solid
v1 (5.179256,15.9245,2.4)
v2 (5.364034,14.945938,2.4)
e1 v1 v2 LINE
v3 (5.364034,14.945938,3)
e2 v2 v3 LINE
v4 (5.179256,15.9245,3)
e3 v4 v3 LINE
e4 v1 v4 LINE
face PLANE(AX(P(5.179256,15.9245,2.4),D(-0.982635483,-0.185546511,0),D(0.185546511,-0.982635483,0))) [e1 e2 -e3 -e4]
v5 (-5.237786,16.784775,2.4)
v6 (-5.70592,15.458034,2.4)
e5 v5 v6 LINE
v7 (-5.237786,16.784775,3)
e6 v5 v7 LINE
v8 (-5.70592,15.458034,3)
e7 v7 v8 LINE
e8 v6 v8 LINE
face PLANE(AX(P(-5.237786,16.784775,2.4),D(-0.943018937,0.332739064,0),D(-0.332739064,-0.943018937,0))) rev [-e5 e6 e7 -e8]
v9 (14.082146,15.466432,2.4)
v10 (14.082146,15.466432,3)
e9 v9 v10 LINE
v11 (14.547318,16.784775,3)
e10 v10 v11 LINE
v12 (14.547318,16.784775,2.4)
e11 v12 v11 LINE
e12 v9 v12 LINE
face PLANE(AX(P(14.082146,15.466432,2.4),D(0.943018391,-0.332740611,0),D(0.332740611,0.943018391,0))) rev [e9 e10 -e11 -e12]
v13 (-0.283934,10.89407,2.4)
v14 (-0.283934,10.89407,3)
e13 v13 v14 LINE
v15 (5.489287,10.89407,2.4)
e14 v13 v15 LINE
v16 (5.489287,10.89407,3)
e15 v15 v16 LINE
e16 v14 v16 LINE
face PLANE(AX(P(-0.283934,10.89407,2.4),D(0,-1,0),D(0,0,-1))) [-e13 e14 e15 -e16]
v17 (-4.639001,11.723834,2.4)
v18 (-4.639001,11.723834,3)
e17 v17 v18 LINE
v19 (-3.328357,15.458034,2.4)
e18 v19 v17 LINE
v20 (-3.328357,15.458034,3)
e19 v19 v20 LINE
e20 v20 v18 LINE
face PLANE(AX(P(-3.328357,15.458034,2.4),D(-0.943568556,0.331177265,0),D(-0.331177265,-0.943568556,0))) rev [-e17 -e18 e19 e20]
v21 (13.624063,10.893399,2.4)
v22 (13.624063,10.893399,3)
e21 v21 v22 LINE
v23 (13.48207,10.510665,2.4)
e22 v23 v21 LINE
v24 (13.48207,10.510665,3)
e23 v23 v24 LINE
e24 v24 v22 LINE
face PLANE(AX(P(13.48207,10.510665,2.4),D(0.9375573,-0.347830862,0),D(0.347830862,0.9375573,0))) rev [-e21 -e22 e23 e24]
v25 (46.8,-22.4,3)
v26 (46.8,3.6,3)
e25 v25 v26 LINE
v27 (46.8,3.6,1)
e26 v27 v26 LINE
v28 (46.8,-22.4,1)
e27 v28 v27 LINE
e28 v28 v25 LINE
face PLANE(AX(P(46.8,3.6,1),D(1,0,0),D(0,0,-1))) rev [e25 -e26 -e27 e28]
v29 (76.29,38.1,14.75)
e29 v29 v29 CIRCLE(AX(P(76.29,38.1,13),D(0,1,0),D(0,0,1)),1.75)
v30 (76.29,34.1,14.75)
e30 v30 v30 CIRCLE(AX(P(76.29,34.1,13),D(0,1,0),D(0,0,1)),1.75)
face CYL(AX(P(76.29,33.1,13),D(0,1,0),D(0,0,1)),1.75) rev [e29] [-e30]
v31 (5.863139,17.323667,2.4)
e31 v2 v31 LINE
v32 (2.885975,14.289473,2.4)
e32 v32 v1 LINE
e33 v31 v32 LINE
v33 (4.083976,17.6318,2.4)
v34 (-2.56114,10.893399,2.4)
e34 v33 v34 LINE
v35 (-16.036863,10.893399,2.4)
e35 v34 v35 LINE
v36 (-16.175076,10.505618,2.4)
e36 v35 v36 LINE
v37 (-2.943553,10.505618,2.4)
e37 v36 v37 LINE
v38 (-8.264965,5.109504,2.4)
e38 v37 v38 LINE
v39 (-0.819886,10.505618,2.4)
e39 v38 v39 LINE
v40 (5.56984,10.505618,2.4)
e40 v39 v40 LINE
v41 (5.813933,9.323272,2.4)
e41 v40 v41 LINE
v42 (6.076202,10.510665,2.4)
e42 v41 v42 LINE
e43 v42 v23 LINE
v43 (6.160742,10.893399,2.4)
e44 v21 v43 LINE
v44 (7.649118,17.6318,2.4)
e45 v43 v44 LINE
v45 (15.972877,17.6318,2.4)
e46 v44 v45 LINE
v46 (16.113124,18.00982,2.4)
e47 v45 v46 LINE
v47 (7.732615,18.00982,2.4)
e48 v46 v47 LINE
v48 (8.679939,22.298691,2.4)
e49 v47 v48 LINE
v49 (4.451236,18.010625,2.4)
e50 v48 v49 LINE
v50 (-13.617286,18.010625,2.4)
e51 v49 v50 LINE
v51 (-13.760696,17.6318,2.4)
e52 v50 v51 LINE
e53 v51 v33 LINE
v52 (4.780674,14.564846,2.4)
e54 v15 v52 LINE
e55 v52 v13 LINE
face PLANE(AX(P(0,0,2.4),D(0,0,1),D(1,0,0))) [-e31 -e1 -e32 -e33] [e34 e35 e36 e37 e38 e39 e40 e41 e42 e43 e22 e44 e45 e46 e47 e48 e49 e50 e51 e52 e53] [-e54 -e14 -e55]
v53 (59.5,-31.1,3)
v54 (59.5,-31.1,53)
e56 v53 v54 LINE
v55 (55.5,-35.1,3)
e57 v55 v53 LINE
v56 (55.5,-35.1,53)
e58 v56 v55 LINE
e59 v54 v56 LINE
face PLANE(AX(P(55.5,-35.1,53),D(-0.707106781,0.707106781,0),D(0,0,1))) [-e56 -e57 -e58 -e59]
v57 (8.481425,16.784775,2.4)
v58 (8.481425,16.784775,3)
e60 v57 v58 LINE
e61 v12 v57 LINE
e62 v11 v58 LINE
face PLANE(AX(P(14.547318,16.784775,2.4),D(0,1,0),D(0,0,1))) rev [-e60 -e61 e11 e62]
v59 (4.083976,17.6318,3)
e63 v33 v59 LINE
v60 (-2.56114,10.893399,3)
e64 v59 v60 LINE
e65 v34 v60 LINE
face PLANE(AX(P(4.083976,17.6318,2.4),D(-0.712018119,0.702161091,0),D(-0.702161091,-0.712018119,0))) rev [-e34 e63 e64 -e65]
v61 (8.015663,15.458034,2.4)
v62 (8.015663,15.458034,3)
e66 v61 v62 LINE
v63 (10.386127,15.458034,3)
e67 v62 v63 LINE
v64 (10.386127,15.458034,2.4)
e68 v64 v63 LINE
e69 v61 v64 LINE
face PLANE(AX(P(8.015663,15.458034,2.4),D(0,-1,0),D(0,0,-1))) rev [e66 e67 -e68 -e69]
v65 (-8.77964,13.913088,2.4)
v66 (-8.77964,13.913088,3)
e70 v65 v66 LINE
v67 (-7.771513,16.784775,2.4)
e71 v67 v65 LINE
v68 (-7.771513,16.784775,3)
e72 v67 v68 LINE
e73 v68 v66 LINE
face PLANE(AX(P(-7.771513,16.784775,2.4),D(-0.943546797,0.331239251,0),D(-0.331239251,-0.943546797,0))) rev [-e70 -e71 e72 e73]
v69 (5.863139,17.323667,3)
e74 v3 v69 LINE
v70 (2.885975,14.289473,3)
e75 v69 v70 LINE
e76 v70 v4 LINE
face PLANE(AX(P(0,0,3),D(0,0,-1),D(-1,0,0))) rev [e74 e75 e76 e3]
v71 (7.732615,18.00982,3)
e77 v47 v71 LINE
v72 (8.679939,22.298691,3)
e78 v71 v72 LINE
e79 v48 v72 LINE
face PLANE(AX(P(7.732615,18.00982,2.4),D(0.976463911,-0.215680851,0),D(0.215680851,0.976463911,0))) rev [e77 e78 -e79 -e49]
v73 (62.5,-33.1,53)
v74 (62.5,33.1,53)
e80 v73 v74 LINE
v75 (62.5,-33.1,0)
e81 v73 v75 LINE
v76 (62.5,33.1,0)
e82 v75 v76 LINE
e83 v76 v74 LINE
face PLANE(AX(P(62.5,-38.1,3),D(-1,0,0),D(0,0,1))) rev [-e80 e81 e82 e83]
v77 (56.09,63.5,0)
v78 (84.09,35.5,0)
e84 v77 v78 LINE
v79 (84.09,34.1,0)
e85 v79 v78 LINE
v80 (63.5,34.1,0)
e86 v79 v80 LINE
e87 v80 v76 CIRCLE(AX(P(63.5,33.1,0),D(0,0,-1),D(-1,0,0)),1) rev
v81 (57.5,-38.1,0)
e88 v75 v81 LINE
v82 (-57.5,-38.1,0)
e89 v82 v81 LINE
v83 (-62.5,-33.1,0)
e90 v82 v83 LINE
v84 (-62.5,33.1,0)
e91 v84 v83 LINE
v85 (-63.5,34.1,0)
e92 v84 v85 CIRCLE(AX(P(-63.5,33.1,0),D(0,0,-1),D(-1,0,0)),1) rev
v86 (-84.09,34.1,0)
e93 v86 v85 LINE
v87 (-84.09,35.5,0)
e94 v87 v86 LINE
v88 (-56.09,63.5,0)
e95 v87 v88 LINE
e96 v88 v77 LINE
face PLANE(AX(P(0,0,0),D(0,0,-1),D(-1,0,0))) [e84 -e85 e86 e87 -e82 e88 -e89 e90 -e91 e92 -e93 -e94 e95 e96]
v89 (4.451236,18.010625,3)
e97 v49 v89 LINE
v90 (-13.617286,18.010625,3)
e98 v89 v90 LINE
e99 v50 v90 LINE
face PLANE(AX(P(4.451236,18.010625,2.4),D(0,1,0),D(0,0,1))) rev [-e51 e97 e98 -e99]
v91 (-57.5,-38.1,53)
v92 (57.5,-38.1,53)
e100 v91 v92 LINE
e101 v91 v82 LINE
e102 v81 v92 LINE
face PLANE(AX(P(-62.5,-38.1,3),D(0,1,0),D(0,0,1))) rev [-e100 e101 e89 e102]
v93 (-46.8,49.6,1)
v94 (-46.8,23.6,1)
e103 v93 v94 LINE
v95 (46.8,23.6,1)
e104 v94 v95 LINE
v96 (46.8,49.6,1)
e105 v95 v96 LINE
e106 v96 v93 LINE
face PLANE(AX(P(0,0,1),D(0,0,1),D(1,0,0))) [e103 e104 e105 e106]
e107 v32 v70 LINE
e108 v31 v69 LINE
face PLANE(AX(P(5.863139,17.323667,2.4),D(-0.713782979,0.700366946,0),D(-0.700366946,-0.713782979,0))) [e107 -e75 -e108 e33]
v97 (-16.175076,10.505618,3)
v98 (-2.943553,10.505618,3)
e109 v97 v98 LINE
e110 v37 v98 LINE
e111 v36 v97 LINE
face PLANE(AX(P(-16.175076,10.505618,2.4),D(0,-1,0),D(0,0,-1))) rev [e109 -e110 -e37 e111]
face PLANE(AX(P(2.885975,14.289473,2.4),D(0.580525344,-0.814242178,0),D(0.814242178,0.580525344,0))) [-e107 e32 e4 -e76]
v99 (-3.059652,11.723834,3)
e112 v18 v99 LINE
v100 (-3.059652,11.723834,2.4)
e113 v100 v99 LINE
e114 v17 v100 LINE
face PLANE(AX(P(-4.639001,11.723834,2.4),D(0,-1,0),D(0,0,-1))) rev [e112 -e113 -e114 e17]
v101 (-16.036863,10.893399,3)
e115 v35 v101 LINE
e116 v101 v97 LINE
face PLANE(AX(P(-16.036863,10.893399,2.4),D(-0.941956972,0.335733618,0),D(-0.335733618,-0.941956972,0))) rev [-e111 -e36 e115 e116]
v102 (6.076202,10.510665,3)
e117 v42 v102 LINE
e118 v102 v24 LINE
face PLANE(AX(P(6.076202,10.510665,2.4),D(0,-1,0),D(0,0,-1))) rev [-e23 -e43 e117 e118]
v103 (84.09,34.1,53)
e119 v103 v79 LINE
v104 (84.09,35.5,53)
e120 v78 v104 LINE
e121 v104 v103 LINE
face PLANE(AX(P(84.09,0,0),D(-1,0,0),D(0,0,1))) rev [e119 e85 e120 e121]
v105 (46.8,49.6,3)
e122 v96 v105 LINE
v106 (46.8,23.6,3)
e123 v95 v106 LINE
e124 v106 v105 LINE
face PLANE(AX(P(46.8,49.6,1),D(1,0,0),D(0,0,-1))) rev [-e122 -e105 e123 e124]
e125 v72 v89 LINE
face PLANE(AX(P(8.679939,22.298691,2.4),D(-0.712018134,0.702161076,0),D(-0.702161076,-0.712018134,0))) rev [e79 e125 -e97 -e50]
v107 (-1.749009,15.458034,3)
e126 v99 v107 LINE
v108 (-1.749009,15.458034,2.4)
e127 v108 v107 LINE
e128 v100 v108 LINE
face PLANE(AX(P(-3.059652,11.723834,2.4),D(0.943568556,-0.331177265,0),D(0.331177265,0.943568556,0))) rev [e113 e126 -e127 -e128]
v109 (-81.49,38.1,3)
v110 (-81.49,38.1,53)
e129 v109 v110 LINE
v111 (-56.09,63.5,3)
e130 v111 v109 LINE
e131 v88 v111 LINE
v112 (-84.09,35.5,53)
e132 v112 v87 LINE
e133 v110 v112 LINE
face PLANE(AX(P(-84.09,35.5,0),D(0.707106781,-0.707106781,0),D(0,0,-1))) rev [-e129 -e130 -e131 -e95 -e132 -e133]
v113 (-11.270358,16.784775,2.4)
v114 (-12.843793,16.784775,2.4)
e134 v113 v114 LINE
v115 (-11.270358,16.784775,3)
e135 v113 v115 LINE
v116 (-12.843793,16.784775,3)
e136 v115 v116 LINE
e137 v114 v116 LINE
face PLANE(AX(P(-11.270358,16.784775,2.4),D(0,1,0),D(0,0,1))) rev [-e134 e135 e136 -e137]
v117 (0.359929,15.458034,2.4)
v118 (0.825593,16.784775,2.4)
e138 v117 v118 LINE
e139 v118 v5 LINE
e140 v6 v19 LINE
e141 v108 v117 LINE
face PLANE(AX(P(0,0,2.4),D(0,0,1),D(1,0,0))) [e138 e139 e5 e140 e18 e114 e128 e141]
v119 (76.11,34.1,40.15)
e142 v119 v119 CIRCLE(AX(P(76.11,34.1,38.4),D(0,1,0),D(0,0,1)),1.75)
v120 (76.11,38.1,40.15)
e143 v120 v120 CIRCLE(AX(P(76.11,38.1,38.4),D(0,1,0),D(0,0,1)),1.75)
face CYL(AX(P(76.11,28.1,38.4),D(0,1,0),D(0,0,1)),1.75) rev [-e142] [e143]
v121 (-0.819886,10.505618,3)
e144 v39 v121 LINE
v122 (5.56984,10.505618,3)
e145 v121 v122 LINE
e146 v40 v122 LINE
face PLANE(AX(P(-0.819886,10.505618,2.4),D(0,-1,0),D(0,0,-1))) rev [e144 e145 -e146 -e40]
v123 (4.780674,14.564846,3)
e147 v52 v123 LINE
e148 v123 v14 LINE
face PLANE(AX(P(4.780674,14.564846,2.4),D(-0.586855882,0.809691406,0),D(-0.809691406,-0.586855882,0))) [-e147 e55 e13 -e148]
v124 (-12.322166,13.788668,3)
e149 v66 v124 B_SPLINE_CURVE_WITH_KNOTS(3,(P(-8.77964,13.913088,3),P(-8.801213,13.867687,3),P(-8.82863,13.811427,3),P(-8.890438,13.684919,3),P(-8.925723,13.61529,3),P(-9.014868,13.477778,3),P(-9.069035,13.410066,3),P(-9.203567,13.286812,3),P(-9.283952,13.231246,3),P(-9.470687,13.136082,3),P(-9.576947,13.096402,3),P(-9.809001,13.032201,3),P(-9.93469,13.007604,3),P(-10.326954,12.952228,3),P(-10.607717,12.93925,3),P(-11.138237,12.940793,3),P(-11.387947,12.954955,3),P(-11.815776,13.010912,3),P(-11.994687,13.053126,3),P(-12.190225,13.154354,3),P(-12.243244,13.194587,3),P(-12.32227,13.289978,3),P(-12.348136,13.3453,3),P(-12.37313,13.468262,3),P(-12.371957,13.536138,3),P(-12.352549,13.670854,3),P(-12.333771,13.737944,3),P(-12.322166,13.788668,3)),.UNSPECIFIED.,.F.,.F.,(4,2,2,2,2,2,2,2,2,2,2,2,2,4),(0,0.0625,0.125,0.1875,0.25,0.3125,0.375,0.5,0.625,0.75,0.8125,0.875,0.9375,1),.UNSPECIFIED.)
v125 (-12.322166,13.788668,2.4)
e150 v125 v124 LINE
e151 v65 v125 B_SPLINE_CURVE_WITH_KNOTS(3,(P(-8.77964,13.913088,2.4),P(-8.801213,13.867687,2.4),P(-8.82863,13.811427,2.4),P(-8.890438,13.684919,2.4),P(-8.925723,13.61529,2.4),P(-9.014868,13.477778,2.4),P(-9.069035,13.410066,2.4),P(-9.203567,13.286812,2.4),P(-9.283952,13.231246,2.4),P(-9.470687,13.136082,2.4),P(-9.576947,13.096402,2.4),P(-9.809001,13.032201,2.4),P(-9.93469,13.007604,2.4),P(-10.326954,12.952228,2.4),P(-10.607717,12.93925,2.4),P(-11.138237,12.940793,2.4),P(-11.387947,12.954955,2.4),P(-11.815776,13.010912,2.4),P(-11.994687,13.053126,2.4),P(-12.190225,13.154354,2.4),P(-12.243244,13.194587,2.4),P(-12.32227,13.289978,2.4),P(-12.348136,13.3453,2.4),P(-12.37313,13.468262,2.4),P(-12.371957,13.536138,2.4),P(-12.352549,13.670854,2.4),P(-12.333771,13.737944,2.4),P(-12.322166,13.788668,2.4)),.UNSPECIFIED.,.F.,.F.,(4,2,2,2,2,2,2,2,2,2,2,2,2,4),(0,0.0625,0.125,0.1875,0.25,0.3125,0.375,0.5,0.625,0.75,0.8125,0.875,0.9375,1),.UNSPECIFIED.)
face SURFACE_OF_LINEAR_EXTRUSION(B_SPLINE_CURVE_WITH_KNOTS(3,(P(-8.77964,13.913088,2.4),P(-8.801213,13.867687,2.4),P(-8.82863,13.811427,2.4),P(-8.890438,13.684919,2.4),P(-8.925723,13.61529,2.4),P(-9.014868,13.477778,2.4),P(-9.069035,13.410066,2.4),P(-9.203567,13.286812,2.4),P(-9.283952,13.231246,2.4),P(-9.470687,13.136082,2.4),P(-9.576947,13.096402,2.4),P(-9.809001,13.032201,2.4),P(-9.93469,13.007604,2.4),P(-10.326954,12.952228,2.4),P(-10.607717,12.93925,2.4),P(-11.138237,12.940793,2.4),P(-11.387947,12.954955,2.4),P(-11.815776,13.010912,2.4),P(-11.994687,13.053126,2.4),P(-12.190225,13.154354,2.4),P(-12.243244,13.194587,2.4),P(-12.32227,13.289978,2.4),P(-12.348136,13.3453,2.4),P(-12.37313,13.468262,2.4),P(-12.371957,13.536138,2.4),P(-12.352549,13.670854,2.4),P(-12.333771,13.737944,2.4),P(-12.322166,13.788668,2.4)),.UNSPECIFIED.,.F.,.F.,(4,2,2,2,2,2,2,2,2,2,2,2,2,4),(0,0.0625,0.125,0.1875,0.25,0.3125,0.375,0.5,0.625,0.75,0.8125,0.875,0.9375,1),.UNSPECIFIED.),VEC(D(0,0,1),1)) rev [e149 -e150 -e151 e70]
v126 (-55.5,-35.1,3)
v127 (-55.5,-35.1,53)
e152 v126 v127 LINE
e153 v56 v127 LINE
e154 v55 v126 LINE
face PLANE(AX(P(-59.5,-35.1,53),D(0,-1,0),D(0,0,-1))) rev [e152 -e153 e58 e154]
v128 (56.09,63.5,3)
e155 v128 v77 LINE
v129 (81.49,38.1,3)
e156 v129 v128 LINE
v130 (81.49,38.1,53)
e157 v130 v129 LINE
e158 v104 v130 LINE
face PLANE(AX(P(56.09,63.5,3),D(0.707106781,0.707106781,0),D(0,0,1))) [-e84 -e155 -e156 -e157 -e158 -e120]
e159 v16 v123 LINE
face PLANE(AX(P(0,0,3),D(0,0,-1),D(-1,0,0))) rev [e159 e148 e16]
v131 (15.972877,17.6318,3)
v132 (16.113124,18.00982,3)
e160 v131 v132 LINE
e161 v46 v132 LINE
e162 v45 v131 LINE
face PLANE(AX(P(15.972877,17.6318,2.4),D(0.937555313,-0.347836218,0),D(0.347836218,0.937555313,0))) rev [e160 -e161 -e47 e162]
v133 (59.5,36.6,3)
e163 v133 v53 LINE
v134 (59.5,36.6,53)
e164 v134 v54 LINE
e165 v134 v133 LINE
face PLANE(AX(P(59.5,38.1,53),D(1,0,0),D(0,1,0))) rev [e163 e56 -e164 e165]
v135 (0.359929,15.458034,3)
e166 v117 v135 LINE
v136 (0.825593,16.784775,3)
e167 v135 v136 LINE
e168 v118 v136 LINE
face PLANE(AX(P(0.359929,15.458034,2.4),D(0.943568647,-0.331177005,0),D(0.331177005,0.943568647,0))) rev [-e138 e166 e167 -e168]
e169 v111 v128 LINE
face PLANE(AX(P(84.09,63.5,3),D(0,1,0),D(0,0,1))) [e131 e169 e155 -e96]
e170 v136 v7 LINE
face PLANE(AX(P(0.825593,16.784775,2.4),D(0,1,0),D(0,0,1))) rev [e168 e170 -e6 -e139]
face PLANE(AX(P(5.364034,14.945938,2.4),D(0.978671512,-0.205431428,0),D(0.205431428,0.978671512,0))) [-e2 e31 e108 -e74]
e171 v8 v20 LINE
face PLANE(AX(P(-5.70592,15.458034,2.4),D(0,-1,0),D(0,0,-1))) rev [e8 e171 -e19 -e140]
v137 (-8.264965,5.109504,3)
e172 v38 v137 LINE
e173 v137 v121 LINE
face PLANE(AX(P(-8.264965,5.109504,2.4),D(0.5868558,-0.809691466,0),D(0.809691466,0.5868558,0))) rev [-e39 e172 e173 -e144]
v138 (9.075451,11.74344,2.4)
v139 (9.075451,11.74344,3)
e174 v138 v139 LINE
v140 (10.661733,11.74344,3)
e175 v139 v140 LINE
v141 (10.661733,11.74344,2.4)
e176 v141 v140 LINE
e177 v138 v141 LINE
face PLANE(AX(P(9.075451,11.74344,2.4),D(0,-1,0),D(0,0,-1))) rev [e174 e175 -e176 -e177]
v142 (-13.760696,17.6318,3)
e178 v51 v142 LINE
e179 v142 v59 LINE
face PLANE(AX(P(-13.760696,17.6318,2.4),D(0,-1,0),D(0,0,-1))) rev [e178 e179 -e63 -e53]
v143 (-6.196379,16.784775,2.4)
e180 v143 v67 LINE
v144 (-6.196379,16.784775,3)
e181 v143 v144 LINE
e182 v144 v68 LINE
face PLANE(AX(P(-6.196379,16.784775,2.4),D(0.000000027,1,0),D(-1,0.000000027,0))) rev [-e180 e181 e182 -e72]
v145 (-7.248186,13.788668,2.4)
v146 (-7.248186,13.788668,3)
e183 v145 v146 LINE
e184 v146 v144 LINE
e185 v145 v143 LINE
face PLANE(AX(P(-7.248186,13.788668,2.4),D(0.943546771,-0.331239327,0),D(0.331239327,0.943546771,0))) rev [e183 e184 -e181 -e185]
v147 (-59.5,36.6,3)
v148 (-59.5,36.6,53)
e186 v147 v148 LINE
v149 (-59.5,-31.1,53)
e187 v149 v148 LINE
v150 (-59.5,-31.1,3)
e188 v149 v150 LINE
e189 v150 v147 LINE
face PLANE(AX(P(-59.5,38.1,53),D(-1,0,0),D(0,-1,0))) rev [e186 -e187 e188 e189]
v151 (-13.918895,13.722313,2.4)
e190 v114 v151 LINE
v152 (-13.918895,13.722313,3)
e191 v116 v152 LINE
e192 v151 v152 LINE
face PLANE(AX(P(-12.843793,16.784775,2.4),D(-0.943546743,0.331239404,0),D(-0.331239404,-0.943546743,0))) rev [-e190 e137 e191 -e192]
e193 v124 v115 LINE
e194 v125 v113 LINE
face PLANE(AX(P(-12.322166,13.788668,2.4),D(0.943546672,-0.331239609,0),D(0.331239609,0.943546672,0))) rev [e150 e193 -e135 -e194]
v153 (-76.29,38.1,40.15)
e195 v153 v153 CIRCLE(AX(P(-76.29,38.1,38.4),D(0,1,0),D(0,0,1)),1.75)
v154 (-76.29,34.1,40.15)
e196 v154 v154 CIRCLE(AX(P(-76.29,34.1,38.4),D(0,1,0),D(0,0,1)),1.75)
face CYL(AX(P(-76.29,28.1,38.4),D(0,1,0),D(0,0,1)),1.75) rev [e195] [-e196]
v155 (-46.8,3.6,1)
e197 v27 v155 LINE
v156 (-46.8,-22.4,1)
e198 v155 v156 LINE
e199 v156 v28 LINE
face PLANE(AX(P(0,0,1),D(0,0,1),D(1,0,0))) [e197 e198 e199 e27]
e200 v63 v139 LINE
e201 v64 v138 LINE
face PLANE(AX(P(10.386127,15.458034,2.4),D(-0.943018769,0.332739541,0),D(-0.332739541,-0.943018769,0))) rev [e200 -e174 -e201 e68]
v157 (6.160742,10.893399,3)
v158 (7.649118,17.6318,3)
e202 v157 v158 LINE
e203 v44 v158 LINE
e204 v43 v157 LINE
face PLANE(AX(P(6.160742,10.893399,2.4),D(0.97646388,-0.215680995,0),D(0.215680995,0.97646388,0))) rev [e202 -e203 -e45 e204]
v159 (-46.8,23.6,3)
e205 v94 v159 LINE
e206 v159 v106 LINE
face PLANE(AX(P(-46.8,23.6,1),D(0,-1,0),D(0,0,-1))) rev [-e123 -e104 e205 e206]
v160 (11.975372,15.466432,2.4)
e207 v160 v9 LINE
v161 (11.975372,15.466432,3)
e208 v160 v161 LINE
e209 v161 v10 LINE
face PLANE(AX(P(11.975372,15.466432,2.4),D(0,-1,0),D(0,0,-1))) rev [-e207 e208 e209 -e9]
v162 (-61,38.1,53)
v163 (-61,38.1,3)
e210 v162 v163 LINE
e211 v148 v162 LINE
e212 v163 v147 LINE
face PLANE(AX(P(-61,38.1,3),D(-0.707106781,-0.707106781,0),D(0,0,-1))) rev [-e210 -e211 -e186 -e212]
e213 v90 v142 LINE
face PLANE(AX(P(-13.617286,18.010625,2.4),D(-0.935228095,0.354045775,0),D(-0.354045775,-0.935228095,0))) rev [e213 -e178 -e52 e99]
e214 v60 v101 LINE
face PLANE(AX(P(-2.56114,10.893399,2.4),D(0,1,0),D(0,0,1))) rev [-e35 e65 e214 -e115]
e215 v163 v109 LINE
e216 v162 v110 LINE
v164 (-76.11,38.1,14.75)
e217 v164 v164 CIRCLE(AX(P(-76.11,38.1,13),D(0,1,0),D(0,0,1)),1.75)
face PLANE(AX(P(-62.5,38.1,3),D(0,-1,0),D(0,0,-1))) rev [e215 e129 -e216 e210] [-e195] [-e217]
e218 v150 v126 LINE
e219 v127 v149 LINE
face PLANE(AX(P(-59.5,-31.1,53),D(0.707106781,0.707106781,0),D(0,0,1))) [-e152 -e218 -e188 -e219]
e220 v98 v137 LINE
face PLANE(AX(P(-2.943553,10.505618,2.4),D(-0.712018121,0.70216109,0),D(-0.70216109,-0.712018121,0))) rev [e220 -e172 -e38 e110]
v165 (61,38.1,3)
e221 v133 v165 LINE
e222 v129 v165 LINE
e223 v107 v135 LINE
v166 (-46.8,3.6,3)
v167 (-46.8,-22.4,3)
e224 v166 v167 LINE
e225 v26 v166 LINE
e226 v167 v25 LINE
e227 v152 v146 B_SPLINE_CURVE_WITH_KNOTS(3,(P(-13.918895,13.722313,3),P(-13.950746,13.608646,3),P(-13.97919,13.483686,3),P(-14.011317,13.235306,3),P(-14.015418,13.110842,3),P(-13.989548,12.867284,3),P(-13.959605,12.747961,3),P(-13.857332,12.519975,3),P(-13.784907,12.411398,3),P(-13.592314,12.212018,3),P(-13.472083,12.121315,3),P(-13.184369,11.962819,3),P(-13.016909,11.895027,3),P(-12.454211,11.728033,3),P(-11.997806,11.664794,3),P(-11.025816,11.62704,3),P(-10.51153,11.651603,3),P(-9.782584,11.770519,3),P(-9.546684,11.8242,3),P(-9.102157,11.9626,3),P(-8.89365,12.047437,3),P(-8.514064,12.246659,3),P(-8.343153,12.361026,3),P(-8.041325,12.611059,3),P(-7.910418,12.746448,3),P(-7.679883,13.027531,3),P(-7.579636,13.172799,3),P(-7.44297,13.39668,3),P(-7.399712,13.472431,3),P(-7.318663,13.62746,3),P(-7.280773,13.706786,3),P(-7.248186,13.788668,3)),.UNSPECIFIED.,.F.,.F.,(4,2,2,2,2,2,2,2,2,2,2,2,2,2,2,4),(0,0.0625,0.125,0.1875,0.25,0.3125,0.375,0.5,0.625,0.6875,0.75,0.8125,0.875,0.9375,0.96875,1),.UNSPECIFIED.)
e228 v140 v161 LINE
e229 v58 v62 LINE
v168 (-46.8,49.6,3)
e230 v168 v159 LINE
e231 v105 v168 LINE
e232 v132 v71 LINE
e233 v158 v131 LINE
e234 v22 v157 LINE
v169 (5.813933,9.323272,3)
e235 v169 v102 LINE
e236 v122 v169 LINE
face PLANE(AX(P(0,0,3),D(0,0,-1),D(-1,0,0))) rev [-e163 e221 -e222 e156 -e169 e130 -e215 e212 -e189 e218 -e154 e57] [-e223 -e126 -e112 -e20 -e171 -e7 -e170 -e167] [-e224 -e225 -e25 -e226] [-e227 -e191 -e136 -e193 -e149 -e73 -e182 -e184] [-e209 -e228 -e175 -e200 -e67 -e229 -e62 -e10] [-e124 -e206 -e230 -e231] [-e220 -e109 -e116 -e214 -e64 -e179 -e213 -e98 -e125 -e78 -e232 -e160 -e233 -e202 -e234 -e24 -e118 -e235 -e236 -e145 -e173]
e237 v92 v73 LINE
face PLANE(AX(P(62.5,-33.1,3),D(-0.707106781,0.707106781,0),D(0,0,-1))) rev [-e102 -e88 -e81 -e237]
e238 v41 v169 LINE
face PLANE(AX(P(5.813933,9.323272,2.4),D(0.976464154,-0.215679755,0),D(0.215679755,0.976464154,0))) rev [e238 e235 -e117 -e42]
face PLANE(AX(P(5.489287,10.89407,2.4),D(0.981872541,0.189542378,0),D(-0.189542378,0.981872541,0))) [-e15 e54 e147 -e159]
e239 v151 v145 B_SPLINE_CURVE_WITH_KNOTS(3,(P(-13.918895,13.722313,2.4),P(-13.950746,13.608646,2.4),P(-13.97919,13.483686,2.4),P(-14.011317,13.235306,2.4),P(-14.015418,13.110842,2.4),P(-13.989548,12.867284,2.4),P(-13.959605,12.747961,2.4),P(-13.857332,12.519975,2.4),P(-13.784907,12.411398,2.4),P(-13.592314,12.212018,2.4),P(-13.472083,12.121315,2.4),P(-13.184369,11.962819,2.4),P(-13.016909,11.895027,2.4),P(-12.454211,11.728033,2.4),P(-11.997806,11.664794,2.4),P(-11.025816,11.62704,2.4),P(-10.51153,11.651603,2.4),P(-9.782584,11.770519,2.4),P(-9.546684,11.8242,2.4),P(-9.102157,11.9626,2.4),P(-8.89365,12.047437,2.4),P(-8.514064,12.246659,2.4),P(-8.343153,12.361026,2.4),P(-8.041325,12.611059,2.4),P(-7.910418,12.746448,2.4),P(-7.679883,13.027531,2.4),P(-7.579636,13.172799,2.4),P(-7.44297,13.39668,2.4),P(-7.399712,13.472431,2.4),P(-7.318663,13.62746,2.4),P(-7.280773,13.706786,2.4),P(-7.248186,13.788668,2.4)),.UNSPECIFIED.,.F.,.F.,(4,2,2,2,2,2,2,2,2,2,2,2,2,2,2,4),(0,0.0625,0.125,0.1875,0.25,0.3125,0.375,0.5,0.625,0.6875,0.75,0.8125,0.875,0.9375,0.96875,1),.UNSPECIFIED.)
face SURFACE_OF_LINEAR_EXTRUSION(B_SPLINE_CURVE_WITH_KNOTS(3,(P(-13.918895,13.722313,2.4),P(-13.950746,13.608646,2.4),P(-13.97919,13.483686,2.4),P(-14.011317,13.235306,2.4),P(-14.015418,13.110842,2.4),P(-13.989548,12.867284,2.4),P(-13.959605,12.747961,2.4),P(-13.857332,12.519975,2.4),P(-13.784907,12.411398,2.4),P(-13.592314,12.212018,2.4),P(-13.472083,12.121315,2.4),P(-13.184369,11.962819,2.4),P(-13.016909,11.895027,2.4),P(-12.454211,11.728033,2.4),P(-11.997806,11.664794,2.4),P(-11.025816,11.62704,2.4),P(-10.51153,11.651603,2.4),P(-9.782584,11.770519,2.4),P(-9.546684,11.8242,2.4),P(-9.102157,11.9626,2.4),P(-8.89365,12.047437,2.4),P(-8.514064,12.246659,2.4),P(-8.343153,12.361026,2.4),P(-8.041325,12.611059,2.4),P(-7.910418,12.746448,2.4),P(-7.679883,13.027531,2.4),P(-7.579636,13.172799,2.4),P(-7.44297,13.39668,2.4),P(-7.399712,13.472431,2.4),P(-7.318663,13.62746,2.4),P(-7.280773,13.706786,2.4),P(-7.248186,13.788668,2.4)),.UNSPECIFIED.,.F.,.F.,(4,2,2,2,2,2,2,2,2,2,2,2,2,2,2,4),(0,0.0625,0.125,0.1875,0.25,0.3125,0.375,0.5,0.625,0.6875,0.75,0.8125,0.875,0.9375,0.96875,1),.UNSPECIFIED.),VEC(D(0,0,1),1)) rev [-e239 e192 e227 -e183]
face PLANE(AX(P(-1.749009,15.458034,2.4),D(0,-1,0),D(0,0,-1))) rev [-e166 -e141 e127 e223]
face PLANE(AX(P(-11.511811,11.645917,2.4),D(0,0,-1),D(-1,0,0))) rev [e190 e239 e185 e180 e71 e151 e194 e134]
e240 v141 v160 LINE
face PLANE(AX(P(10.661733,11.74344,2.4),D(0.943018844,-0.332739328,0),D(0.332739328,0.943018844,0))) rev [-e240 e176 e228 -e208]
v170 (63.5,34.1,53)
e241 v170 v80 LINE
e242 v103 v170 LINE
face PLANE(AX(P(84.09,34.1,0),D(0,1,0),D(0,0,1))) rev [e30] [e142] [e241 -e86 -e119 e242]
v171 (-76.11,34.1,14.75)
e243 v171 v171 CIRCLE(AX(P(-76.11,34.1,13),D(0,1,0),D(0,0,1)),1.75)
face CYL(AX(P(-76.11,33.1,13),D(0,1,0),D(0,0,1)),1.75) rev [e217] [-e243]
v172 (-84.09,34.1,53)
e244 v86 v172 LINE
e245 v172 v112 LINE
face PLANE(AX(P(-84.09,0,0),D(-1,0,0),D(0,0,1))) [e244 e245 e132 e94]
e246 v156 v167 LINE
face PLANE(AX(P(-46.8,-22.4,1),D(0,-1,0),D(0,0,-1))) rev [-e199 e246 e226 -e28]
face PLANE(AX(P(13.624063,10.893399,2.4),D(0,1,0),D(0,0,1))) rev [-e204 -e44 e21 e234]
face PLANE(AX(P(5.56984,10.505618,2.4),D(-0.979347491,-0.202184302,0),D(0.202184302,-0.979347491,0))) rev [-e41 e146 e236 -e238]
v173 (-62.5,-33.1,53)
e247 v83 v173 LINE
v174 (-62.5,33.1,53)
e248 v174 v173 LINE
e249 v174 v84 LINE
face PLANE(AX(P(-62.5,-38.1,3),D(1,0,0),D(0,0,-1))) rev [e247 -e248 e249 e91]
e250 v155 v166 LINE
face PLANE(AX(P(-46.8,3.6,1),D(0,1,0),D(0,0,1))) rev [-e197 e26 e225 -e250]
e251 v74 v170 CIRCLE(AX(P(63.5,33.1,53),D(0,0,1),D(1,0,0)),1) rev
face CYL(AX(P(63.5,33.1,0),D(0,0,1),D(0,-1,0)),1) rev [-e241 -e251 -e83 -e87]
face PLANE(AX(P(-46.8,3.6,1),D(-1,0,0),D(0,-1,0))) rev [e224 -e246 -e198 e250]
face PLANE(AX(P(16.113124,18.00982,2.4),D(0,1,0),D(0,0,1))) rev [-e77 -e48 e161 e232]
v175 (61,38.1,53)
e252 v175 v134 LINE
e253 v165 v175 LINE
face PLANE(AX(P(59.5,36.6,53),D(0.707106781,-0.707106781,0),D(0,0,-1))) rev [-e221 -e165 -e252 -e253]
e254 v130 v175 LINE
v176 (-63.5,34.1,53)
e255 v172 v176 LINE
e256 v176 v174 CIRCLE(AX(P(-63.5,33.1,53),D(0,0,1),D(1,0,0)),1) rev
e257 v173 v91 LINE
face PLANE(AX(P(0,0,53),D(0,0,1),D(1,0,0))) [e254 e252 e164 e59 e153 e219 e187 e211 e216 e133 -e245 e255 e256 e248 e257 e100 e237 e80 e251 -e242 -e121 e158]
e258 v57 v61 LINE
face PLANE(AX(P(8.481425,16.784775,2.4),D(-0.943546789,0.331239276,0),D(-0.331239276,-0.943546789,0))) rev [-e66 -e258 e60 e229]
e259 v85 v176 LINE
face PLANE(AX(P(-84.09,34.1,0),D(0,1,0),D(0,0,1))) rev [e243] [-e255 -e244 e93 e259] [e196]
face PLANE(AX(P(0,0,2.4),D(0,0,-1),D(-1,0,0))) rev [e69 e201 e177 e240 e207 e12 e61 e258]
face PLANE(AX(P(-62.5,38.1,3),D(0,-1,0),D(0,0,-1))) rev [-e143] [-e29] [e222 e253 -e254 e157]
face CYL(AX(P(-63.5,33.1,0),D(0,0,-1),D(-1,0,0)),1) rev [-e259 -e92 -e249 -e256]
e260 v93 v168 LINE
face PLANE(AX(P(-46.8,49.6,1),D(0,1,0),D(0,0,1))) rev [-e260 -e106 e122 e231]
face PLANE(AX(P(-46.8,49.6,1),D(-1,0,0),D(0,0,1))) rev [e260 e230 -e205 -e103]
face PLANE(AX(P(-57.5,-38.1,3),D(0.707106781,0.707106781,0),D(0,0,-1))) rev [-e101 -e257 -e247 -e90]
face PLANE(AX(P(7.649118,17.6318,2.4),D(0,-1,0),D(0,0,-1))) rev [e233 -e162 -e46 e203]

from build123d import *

# Parameters (mm, degrees)
SKETCH1_W           = 125
SKETCH1_H           = 76.2
BOSS_EXTRUDE1_DEPTH = 3
SKETCH2_W           = 3
SKETCH2_H           = 76.2
BOSS_EXTRUDE2_DEPTH = 50
SKETCH4_W           = 53
SKETCH4_H           = 4
BOSS_EXTRUDE4_DEPTH = 21.59
SKETCH5_W           = 53
SKETCH5_H           = 4
BOSS_EXTRUDE5_DEPTH = 21.59
SKETCH6_W           = 168.18
SKETCH6_H           = 25.4
BOSS_EXTRUDE6_DEPTH = 3
CHAMFER1_SIZE       = 28
SKETCH7_W           = 93.6
SKETCH7_H           = 26
CUT_EXTRUDE1_DEPTH  = 2
SKETCH9_W           = 119
SKETCH9_H           = 3
BOSS_EXTRUDE7_DEPTH = 50
CHAMFER2_SIZE       = 4
CHAMFER3_SIZE       = 5
CUT_EXTRUDE2_START  = -0.6
CUT_EXTRUDE2_DEPTH  = 0.6
SKETCH11_R          = 1.75
CUT_EXTRUDE3_DEPTH  = 5
FILLET1_R           = 1
CHAMFER4_SIZE       = 1.5
SKETCH13_R          = 1.75
CUT_EXTRUDE4_DEPTH  = 10


# Read off the part's stored shape, not the designer's step: Cut-Extrude2
with BuildPart() as part:
    # Sketch1 → Boss-Extrude1 (new body)
    with BuildSketch(Plane.XY):
        Rectangle(SKETCH1_W, SKETCH1_H)
    extrude(amount=BOSS_EXTRUDE1_DEPTH)

    # Sketch2 → Boss-Extrude2 (add)
    with BuildSketch(Plane.XY.offset(3)):
        with Locations((-61, 0)):
            Rectangle(SKETCH2_W, SKETCH2_H)
        with Locations((61, 0)):
            Rectangle(SKETCH2_W, SKETCH2_H)
    extrude(amount=BOSS_EXTRUDE2_DEPTH)

    # Sketch4 → Boss-Extrude4 (add)
    with BuildSketch(Plane.ZY.offset(62.5)):
        with Locations((26.5, 36.1)):
            Rectangle(SKETCH4_W, SKETCH4_H)
    extrude(amount=BOSS_EXTRUDE4_DEPTH)

    # Sketch5 → Boss-Extrude5 (add)
    with BuildSketch(Plane(origin=(62.5, 0, 0), x_dir=(0, 0, -1), z_dir=(1, 0, 0))):
        with Locations((-26.5, 36.1)):
            Rectangle(SKETCH5_W, SKETCH5_H)
    extrude(amount=BOSS_EXTRUDE5_DEPTH)

    # Sketch6 → Boss-Extrude6 (add)
    with BuildSketch(Plane(origin=(0, 0, 0), x_dir=(-1, 0, 0), z_dir=(0, 0, -1))):
        with Locations((0, 50.8)):
            Rectangle(SKETCH6_W, SKETCH6_H)
    extrude(amount=-BOSS_EXTRUDE6_DEPTH)

    # Chamfer1
    chamfer1_edges = [part.edges().sort_by_distance(p)[0] for p in [
        (-84.09, 63.5, 1.5),
        (84.09, 63.5, 1.5),
    ]]
    chamfer(chamfer1_edges, length=CHAMFER1_SIZE)

    # Sketch7 → Cut-Extrude1 (cut)
    with BuildSketch(Plane.XY.offset(3)):
        with Locations((0, -9.4)):
            Rectangle(SKETCH7_W, SKETCH7_H)
        with Locations((0, 36.6)):
            Rectangle(SKETCH7_W, SKETCH7_H)
    extrude(amount=-CUT_EXTRUDE1_DEPTH, mode=Mode.SUBTRACT)

    # Sketch9 → Boss-Extrude7 (add)
    with BuildSketch(Plane.XY.offset(3)):
        with Locations((0, -36.6)):
            Rectangle(SKETCH9_W, SKETCH9_H)
    extrude(amount=BOSS_EXTRUDE7_DEPTH)

    # Chamfer2
    chamfer2_edges = [part.edges().sort_by_distance(p)[0] for p in [
        (-59.5, -35.1, 28),
        (59.5, -35.1, 28),
    ]]
    chamfer(chamfer2_edges, length=CHAMFER2_SIZE)

    # Chamfer3
    chamfer3_edges = [part.edges().sort_by_distance(p)[0] for p in [
        (62.5, -38.1, 26.5),
        (-62.5, -38.1, 26.5),
    ]]
    chamfer(chamfer3_edges, length=CHAMFER3_SIZE)

    # Cut-Extrude2 outline → Cut-Extrude2 (cut)
    # profile 1 of 4: a face of its own
    with BuildSketch(Plane.XY.offset(3).offset(CUT_EXTRUDE2_START)):
        with BuildLine():
            Line((-12.843793417, 16.784775128), (-13.918894641, 13.722312614))
            add(Edge.make_bspline(
                [(-13.918894641, 13.722312614), (-13.950745906, 13.608646354), (-13.97919001, 13.483685694), (-14.011317489, 13.235305925), (-14.01541758, 13.110841548), (-13.989547543, 12.867284383), (-13.959604678, 12.747961158), (-13.857332343, 12.519974586), (-13.78490702, 12.411398187), (-13.592313629, 12.212018271), (-13.472083062, 12.121314997), (-13.184369222, 11.962818623), (-13.016909084, 11.895027419), (-12.454211206, 11.728033285), (-11.997806272, 11.664794493), (-11.025815686, 11.62704002), (-10.511530183, 11.651603075), (-9.78258436, 11.770518687), (-9.546683753, 11.824200176), (-9.102156978, 11.962599668), (-8.89364967, 12.047436893), (-8.514064046, 12.246658938), (-8.343153207, 12.361026326), (-8.04132547, 12.611058926), (-7.910418089, 12.746448479), (-7.679883041, 13.0275306), (-7.579636344, 13.172799488), (-7.44297026, 13.39668043), (-7.39971151, 13.472431032), (-7.318663078, 13.627460279), (-7.280772846, 13.706786212), (-7.248185858, 13.788667895)],
                knots=[0, 0, 0, 0, 0.0625, 0.0625, 0.125, 0.125, 0.1875, 0.1875, 0.25, 0.25, 0.3125, 0.3125, 0.375, 0.375, 0.5, 0.5, 0.625, 0.625, 0.6875, 0.6875, 0.75, 0.75, 0.8125, 0.8125, 0.875, 0.875, 0.9375, 0.9375, 0.96875, 0.96875, 1, 1, 1, 1], degree=3))
            Line((-7.248185858, 13.788667895), (-6.196379448, 16.784775128))
            Line((-6.196379448, 16.784775128), (-7.771512854, 16.784775171))
            Line((-7.771512854, 16.784775171), (-8.779640442, 13.913087848))
            add(Edge.make_bspline(
                [(-8.779640442, 13.913087848), (-8.801212863, 13.867686768), (-8.828630281, 13.811426743), (-8.890437912, 13.684919137), (-8.925723343, 13.615289873), (-9.014867696, 13.477778317), (-9.069034752, 13.410065742), (-9.20356673, 13.286811644), (-9.283951715, 13.231246188), (-9.470687062, 13.136081945), (-9.576947425, 13.096402347), (-9.809000897, 13.032201026), (-9.934689567, 13.00760449), (-10.326953956, 12.952228061), (-10.607716868, 12.939250309), (-11.138236784, 12.940792557), (-11.387946526, 12.95495502), (-11.815776289, 13.010911905), (-11.994686961, 13.05312605), (-12.19022456, 13.154353945), (-12.243244201, 13.194586759), (-12.322270156, 13.289978248), (-12.348136332, 13.345299657), (-12.373130151, 13.46826163), (-12.371956966, 13.5361378), (-12.35254935, 13.67085438), (-12.333771283, 13.737944141), (-12.322165603, 13.788667937)],
                knots=[0, 0, 0, 0, 0.0625, 0.0625, 0.125, 0.125, 0.1875, 0.1875, 0.25, 0.25, 0.3125, 0.3125, 0.375, 0.375, 0.5, 0.5, 0.625, 0.625, 0.75, 0.75, 0.8125, 0.8125, 0.875, 0.875, 0.9375, 0.9375, 1, 1, 1, 1], degree=3))
            Line((-12.322165603, 13.788667937), (-11.2703582, 16.784775128))
            Line((-11.2703582, 16.784775128), (-12.843793417, 16.784775128))
        make_face()
    # profile 2 of 4: a face of its own
    with BuildSketch(Plane.XY.offset(3).offset(CUT_EXTRUDE2_START)):
        Polygon((14.082145905, 15.466432145), (14.547318434, 16.784775128), (8.481425261, 16.784775128), (8.015662645, 15.45803385), (10.386127447, 15.45803385), (9.075451111, 11.743439605), (10.661733364, 11.743439605), (11.975372051, 15.466432145), align=None)
    # profile 3 of 4: a face of its own
    with BuildSketch(Plane.XY.offset(3).offset(CUT_EXTRUDE2_START)):
        Polygon((0.359928822, 15.45803385), (0.825593089, 16.784775128), (-5.237786258, 16.784775128), (-5.705919648, 15.45803385), (-3.328357423, 15.45803385), (-4.639000977, 11.723834147), (-3.059652234, 11.723834147), (-1.74900868, 15.45803385), align=None)
    # profile 4 of 4: a face of its own
    with BuildSketch(Plane.XY.offset(3).offset(CUT_EXTRUDE2_START)):
        Polygon((7.732615088, 18.009820452), (8.67993853, 22.298690548), (4.451236342, 18.010625114), (-13.617285872, 18.010625114), (-13.760696138, 17.631800344), (4.083976363, 17.631800344), (-2.561139847, 10.89339914), (-16.036862666, 10.89339914), (-16.175076152, 10.505618026), (-2.943552817, 10.505618026), (-8.264964605, 5.10950355), (-0.819885517, 10.505618026), (5.569839691, 10.505618026), (5.813932632, 9.32327198), (6.07620201, 10.510665049), (13.482070183, 10.510665049), (13.624063348, 10.89339914), (6.160742258, 10.89339914), (7.649117922, 17.631800344), (15.972876762, 17.631800344), (16.113123511, 18.009820452), align=None)
        Polygon((-0.283933962, 10.894070437), (4.780674194, 14.564845582), (5.489286994, 10.894070437), align=None, mode=Mode.SUBTRACT)
        Polygon((5.863139247, 17.323666682), (5.364033793, 14.945937564), (5.179256414, 15.9244998), (2.885975157, 14.289472868), align=None, mode=Mode.SUBTRACT)
    extrude(amount=CUT_EXTRUDE2_DEPTH, mode=Mode.SUBTRACT)

    # Sketch11 → Cut-Extrude3 (cut)
    with BuildSketch(Plane(origin=(0, 38.1, 0), x_dir=(1, 0, 0), z_dir=(0, 1, 0))):
        with Locations(Location((-76.11, -13, 0), (0, 0, 270))):
            Circle(SKETCH11_R)
        with Locations(Location((76.29, -13, 0), (0, 0, 270))):
            Circle(SKETCH11_R)
    extrude(amount=-CUT_EXTRUDE3_DEPTH, mode=Mode.SUBTRACT)

    # Fillet1
    fillet1_edges = [part.edges().sort_by_distance(p)[0] for p in [
        (-62.5, 34.1, 26.5),
        (62.5, 34.1, 26.5),
    ]]
    fillet(fillet1_edges, radius=FILLET1_R)

    # Chamfer4
    chamfer4_edges = [part.edges().sort_by_distance(p)[0] for p in [
        (-59.5, 38.1, 28),
        (59.5, 38.1, 28),
    ]]
    chamfer(chamfer4_edges, length=CHAMFER4_SIZE)

    # Sketch13 → Cut-Extrude4 (cut)
    with BuildSketch(Plane(origin=(0, 38.1, 0), x_dir=(1, 0, 0), z_dir=(0, 1, 0))):
        with Locations(Location((-76.29, -38.4, 0), (0, 0, 270))):
            Circle(SKETCH13_R)
        with Locations(Location((76.11, -38.4, 0), (0, 0, 270))):
            Circle(SKETCH13_R)
    extrude(amount=-CUT_EXTRUDE4_DEPTH, mode=Mode.SUBTRACT)


solid = part.part
